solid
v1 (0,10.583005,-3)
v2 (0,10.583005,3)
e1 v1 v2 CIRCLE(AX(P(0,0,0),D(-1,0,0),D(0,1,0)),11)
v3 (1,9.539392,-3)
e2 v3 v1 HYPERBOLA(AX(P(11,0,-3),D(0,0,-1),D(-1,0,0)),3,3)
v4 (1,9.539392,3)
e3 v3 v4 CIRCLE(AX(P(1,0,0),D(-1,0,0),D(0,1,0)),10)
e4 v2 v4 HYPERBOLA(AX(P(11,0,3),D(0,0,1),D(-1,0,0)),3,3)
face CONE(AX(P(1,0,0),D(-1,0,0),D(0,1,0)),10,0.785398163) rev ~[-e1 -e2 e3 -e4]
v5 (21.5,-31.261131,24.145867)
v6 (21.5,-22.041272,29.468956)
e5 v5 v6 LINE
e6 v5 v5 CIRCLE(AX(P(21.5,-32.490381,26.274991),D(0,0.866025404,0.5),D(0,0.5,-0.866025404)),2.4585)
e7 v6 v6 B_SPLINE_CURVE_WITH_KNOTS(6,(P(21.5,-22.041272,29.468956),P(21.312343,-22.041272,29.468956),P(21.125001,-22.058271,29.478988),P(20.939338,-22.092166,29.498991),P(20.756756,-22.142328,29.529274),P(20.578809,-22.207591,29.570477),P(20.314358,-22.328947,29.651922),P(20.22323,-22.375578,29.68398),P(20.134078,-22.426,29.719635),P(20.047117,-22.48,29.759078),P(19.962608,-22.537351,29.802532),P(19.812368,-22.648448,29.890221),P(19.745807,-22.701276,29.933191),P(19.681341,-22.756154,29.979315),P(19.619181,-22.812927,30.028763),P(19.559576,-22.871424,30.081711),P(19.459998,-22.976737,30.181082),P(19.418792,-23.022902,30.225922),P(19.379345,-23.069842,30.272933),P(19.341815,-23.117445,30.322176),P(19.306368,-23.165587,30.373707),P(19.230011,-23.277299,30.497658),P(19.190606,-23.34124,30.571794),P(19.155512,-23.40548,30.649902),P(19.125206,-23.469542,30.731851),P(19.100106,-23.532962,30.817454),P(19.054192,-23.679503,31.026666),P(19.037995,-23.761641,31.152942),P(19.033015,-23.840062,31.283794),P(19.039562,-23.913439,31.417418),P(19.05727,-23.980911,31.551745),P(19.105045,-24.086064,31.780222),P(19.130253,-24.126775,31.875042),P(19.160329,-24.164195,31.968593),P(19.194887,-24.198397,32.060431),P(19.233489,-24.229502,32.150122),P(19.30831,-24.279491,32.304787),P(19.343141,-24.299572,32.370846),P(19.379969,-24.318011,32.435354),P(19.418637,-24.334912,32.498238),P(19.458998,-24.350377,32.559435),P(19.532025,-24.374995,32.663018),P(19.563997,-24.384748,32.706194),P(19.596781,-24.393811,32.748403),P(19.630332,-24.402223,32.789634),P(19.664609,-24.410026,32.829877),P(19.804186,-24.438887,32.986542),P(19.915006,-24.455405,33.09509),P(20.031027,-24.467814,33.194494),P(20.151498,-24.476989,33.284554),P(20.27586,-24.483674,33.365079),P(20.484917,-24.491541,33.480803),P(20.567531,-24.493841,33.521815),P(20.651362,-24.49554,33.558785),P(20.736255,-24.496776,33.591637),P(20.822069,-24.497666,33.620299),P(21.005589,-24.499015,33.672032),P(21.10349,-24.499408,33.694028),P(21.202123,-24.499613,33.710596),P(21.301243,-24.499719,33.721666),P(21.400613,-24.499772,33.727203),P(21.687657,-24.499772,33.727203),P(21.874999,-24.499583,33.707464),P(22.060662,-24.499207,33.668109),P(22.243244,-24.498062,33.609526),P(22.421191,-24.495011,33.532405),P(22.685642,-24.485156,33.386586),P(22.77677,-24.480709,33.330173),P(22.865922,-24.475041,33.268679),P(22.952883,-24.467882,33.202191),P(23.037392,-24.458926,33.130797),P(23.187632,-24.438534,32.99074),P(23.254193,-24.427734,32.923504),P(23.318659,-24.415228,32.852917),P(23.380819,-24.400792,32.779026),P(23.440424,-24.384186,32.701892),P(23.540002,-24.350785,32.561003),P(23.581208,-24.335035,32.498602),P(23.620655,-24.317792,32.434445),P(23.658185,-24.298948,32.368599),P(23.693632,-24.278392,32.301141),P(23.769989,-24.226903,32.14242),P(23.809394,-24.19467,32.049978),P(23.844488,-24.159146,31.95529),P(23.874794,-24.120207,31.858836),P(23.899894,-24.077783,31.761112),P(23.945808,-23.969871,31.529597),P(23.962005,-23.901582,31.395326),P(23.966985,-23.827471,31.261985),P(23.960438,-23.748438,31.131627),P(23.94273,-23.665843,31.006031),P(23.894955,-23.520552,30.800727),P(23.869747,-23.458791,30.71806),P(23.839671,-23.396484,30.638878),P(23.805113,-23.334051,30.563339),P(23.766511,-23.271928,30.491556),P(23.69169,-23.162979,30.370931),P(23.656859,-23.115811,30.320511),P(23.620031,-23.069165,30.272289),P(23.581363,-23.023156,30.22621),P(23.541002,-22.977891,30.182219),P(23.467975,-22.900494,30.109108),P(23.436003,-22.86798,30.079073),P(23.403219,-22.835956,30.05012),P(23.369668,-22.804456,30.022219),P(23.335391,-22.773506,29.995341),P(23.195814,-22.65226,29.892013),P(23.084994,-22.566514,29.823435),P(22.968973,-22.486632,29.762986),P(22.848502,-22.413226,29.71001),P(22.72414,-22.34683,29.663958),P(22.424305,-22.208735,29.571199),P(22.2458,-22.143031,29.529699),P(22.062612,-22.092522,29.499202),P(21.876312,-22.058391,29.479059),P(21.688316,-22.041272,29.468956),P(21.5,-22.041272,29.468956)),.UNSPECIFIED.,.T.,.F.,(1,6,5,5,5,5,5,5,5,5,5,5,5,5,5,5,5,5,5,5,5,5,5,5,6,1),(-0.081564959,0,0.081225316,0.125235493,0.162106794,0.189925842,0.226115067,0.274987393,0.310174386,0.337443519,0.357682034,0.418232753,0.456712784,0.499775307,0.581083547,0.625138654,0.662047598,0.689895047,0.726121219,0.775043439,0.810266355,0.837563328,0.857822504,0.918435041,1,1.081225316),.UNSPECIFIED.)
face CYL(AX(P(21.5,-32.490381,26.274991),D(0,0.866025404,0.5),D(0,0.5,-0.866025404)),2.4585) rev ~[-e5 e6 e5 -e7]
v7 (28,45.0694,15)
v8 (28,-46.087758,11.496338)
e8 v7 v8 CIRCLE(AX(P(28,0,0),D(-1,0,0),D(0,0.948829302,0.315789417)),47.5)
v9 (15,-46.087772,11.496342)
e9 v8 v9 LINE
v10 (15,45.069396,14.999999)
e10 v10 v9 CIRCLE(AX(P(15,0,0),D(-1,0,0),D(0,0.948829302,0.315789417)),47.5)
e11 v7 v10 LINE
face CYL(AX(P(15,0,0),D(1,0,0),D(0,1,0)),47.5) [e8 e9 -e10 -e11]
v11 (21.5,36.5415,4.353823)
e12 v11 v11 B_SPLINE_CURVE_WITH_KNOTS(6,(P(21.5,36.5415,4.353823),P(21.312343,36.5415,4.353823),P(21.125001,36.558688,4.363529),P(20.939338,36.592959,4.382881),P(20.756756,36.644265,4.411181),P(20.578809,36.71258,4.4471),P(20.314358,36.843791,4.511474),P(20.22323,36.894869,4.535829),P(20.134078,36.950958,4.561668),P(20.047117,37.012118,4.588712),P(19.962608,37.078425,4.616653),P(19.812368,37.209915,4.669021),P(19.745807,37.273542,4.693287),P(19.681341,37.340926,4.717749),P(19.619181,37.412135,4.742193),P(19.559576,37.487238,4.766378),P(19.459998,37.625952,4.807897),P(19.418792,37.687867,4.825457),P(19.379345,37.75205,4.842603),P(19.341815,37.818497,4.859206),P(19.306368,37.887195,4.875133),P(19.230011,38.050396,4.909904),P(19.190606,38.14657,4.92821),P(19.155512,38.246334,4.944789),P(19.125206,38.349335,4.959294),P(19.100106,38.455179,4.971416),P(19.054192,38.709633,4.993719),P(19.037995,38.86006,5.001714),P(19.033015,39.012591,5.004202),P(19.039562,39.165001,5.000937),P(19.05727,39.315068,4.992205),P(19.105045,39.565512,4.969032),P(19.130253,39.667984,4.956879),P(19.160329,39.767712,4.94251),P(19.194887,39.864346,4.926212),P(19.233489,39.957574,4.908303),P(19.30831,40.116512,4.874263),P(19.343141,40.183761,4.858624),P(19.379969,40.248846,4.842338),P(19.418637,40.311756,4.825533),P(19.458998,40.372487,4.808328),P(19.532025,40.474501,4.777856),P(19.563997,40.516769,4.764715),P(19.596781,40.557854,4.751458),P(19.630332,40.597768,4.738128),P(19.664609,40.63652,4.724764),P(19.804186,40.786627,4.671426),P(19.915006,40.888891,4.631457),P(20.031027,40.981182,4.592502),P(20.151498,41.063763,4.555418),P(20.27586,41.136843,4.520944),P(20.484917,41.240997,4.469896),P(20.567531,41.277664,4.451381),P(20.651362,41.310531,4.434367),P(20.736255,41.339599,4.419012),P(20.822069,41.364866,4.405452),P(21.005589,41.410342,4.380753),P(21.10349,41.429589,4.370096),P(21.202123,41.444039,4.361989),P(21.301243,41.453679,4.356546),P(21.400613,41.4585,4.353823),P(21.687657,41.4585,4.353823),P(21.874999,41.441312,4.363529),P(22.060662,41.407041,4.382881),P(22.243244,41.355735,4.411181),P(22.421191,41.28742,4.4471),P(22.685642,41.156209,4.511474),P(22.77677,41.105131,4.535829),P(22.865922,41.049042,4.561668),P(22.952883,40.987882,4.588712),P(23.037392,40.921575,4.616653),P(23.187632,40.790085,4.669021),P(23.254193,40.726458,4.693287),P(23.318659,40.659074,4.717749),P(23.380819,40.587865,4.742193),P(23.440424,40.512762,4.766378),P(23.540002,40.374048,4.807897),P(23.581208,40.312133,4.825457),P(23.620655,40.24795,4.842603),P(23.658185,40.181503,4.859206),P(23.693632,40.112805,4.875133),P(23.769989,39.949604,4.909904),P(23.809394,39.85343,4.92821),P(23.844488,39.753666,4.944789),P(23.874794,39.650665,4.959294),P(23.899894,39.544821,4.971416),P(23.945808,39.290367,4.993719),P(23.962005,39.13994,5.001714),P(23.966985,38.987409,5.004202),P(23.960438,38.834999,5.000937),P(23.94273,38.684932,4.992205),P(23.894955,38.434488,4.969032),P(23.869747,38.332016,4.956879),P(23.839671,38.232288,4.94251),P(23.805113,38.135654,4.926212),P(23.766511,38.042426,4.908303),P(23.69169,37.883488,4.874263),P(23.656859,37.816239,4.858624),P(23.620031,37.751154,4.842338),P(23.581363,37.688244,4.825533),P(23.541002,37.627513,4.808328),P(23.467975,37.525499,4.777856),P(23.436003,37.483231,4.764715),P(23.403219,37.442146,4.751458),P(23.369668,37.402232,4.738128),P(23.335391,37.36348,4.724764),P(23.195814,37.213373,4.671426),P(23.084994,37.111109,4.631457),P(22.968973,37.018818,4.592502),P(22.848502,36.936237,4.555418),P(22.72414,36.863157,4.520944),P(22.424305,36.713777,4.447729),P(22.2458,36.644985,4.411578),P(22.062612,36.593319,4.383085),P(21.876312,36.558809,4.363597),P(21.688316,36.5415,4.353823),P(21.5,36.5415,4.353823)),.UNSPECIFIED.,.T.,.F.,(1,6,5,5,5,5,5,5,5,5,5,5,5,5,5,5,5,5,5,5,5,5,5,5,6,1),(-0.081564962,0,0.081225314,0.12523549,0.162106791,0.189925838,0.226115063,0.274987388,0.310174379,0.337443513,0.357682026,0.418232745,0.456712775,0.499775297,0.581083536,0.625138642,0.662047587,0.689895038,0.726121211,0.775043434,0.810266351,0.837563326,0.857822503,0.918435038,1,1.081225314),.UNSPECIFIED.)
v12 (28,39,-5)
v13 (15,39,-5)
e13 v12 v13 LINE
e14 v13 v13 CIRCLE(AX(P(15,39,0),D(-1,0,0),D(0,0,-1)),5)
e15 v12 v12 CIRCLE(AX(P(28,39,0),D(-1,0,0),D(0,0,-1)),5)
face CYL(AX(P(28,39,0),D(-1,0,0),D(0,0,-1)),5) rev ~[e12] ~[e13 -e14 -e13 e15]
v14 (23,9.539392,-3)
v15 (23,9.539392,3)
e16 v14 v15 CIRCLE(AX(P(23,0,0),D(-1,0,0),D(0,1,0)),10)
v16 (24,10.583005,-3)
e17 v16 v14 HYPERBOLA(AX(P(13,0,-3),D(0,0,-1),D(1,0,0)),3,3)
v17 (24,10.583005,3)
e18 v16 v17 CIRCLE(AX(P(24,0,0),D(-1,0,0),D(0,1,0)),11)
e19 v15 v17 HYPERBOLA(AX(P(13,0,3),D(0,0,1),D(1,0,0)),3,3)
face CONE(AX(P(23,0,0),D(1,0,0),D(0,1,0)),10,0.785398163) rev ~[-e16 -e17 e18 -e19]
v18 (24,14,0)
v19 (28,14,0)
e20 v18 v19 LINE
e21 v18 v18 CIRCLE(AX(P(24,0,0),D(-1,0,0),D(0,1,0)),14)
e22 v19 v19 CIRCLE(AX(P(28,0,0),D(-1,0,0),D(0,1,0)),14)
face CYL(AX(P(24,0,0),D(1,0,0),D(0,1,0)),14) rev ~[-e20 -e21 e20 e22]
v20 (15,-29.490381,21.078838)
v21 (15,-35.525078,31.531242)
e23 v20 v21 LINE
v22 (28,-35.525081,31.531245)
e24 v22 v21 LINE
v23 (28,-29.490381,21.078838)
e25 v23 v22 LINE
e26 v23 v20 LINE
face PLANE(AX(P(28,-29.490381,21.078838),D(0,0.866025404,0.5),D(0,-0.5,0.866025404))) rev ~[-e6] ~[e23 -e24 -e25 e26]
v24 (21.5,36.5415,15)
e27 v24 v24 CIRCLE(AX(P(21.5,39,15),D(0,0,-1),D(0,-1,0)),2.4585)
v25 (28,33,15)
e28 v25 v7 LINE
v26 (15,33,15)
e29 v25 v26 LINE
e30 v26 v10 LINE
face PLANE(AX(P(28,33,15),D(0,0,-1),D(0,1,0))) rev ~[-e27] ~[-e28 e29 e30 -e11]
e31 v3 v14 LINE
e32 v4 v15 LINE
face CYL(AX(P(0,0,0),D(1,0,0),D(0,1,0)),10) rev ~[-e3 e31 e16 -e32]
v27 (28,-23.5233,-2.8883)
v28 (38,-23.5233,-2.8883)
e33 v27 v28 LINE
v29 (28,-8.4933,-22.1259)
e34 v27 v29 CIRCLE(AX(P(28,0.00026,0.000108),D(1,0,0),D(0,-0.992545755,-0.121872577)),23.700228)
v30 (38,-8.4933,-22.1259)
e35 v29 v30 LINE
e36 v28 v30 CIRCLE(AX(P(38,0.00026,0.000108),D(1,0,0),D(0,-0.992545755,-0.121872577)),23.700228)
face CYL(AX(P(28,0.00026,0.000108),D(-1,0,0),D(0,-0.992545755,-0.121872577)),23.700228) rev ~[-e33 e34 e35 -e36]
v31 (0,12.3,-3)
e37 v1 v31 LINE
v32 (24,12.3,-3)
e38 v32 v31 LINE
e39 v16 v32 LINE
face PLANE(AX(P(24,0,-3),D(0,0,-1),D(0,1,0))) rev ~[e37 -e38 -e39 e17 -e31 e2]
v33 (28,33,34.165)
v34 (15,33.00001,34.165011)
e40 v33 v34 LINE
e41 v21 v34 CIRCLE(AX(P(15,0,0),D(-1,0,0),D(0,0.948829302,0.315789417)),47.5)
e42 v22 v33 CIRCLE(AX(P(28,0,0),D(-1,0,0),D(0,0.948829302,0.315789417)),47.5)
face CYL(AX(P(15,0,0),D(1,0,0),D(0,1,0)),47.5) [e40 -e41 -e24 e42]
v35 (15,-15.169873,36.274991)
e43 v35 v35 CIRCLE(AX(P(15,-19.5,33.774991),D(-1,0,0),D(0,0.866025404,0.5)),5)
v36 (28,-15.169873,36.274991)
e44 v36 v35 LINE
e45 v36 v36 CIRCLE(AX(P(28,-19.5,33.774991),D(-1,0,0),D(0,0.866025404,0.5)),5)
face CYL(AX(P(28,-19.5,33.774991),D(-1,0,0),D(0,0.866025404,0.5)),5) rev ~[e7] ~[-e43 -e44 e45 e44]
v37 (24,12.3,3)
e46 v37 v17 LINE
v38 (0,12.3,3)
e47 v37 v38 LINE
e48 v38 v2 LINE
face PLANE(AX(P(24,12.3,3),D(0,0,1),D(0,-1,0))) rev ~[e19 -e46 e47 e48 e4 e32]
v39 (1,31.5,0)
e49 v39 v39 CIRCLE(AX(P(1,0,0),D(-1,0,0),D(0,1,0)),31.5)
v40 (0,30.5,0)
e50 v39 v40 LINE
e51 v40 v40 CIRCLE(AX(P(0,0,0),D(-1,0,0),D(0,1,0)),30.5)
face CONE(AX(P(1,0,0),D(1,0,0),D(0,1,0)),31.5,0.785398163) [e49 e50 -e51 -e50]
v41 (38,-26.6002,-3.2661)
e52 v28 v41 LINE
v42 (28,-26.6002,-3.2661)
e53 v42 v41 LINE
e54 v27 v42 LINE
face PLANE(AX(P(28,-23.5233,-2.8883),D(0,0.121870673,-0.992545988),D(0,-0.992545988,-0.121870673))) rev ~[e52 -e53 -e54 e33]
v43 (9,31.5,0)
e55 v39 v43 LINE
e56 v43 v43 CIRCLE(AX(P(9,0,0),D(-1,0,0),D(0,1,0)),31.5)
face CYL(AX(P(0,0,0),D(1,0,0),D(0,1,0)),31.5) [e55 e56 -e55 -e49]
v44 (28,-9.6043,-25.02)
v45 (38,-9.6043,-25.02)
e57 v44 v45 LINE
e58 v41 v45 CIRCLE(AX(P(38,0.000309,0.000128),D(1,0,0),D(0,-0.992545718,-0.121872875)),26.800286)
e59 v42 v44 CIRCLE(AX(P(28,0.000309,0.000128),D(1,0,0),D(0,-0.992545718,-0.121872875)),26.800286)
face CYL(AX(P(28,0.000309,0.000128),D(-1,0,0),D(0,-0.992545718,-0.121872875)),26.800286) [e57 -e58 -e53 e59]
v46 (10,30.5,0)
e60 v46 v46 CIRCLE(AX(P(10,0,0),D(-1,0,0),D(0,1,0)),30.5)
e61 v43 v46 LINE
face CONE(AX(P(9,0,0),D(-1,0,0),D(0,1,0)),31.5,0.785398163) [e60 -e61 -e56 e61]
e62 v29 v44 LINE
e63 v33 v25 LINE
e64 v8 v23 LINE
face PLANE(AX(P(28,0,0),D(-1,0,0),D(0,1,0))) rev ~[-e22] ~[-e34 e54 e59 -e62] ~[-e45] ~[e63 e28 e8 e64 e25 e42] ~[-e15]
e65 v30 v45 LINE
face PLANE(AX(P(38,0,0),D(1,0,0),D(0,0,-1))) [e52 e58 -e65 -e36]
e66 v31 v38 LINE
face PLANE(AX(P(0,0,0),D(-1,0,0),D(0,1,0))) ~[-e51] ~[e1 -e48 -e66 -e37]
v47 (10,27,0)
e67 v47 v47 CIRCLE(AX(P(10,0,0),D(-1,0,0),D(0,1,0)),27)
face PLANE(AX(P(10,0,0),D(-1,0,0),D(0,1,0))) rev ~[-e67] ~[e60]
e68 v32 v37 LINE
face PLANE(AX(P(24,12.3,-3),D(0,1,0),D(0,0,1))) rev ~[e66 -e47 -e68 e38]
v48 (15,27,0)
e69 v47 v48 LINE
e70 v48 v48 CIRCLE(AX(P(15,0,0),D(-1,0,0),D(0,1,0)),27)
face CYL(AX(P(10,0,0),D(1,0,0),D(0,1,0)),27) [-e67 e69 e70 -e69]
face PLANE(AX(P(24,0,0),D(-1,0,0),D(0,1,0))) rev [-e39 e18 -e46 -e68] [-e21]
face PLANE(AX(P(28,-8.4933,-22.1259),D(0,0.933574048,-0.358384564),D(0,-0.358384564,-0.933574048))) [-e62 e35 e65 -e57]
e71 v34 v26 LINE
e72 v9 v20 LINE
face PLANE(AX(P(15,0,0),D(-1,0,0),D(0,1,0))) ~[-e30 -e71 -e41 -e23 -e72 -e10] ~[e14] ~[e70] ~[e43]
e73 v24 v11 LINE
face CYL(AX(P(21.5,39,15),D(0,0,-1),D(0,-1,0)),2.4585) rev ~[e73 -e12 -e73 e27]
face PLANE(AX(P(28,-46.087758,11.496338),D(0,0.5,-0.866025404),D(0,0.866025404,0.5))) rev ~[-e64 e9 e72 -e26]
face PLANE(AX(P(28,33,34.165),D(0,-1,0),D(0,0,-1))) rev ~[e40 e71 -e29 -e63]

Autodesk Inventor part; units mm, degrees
ref_plane "YZ Plane" through (0, 0, 0) normal (1, 0, 0) x (0, 1, 0)
ref_plane "XZ Plane" through (0, 0, 0) normal (0, 1, 0) x (-1, 0, 0)
ref_plane "XY Plane" through (0, 0, 0) normal (0, 0, 1) x (1, 0, 0)
sketch "Sketch1" plane through (0, 0, 0) normal (0, 0, 1) x (1, 0, 0)
  line L0 (0, 0) -> (0, 10) construction
  line L1 (0, 31.5) -> (10, 31.5)
  line L2 (10, 31.5) -> (10, 27)
  line L3 (10, 27) -> (15, 27)
  line L4 (15, 27) -> (15, 47.5)
  line L5 (15, 47.5) -> (28, 47.5)
  line L6 (28, 47.5) -> (28, 14)
  line L7 (28, 0) -> (0, 0)
  line L8 (0, 10) -> (24, 10)
  line L9 (24, 10) -> (24, 14)
  line L10 (24, 14) -> (28, 14)
  line L11 (0, 10) -> (0, 31.5)
  line L12 (28, 14) -> (28, 0) construction
  dimension "d0" = 95
  dimension "d1" = 54
  dimension "d2" = 63
  dimension "d3" = 20
  dimension "d4" = 28
  dimension "d5" = 4
  dimension "d6" = 28
  dimension "d7" = 13
  dimension "d8" = 10
revolve "Revolution1" add sketch "Sketch1" angle 360 about axis through (28, 0, 0) along (-1, 0, 0)
chamfer "Chamfer1" distance 1 angle 45 4 edges at (24, -10, 0) (0, -10, 0) (10, -31.5, 0) (0, -31.5, 0)
sketch "Sketch2" plane through (28, 0, 0) normal (1, 0, 0) x (0, 0, -1)
  circle A0 centre (0, 0) radius 47.5 projected
  circle A1 centre (0, 0) radius 14 projected
  arc A2 (3.2661, -26.6002) -> (25.02, -9.6043) centre (0, 0) ccw
  arc A3 (2.8883, -23.5233) -> (22.1259, -8.4933) centre (0, 0) ccw
  line L0 (2.8883, -23.5233) -> (3.2661, -26.6002)
  line L1 (22.1259, -8.4933) -> (25.02, -9.6043)
  line L2 (0, 0) -> (0, -47.5)
  dimension "d13" = 7
  dimension "d14" = 62
  dimension "d15" = 23.7
  dimension "d16" = 26.8
extrude "Extrusion1" add sketch "Sketch2" along normal blind 10 contours L0 A3 L1 A2
sketch "Sketch3" plane through (28, 0, 0) normal (1, 0, 0) x (0, 0, -1)
  arc A0 (2.8883, -23.5233) -> (22.1259, -8.4933) centre (0, 0) ccw projected
  circle A1 centre (0, 0) radius 47.5 projected
  line L0 (-34.165, 33) -> (-15, 33)
  line L1 (-15, 33) -> (-15, 45.0694)
  dimension "d19" = 33
  dimension "d20" = 15
extrude "Extrusion2" cut sketch "Sketch3" against normal through all contours L1 L0 A1 picked at (-25.8726, 34.6785)
sketch "Sketch4" plane through (28, 33, 15) normal (1, 0, 0) x (0, 0, -1)
  circle A0 centre (15, -33) radius 14 projected
  line L0 (0, 0) -> (-19.165, 0) projected
  point P0 (15, 6)
  dimension "d23" = 6
hole "Hole1" at (28, 39, 0) direction (-1, 0, 0) diameter 10 end through all
sketch "Sketch5" plane through (28, 33, 15) normal (0, 0, 1) x (1, 0, 0)
  line L0 (0, 0) -> (-13, 0) projected
  line L1 (-13, 12.0694) -> (0, 12.0694) projected
  point P0 (-28, -33)
  point P1 (-6.5, 6)
  point P2 (-6.5, 12.0694)
  dimension "d31" = 6
hole "Hole2" at (21.5, 39, 15) direction (0, 0, -1) diameter 4.917 end up to surface thread size "M6x1" class "6H" standard "ISO Metric profile"
pattern_circular "Circular Pattern1" count 2 over 120 about axis through (21.5, 0, 0) along (1, 0, 0) of "Hole2", "Hole1", "Extrusion2"
sketch "Sketch6" plane through (24, 0, 0) normal (1, 0, 0) x (0, 0, -1)
  circle A0 centre (0, 0) radius 14 projected
  line L0 (-3, 0) -> (3, 0)
  line L1 (3, 0) -> (3, 12.3)
  line L2 (3, 12.3) -> (-3, 12.3)
  line L3 (-3, 12.3) -> (-3, 0)
  dimension "d42" = 12.3
  dimension "d43" = 6
extrude "Extrusion3" cut sketch "Sketch6" against normal through all contours L3 L2 L1 L0
properties part number "Part032.Front support" material "Steel, Cast"
